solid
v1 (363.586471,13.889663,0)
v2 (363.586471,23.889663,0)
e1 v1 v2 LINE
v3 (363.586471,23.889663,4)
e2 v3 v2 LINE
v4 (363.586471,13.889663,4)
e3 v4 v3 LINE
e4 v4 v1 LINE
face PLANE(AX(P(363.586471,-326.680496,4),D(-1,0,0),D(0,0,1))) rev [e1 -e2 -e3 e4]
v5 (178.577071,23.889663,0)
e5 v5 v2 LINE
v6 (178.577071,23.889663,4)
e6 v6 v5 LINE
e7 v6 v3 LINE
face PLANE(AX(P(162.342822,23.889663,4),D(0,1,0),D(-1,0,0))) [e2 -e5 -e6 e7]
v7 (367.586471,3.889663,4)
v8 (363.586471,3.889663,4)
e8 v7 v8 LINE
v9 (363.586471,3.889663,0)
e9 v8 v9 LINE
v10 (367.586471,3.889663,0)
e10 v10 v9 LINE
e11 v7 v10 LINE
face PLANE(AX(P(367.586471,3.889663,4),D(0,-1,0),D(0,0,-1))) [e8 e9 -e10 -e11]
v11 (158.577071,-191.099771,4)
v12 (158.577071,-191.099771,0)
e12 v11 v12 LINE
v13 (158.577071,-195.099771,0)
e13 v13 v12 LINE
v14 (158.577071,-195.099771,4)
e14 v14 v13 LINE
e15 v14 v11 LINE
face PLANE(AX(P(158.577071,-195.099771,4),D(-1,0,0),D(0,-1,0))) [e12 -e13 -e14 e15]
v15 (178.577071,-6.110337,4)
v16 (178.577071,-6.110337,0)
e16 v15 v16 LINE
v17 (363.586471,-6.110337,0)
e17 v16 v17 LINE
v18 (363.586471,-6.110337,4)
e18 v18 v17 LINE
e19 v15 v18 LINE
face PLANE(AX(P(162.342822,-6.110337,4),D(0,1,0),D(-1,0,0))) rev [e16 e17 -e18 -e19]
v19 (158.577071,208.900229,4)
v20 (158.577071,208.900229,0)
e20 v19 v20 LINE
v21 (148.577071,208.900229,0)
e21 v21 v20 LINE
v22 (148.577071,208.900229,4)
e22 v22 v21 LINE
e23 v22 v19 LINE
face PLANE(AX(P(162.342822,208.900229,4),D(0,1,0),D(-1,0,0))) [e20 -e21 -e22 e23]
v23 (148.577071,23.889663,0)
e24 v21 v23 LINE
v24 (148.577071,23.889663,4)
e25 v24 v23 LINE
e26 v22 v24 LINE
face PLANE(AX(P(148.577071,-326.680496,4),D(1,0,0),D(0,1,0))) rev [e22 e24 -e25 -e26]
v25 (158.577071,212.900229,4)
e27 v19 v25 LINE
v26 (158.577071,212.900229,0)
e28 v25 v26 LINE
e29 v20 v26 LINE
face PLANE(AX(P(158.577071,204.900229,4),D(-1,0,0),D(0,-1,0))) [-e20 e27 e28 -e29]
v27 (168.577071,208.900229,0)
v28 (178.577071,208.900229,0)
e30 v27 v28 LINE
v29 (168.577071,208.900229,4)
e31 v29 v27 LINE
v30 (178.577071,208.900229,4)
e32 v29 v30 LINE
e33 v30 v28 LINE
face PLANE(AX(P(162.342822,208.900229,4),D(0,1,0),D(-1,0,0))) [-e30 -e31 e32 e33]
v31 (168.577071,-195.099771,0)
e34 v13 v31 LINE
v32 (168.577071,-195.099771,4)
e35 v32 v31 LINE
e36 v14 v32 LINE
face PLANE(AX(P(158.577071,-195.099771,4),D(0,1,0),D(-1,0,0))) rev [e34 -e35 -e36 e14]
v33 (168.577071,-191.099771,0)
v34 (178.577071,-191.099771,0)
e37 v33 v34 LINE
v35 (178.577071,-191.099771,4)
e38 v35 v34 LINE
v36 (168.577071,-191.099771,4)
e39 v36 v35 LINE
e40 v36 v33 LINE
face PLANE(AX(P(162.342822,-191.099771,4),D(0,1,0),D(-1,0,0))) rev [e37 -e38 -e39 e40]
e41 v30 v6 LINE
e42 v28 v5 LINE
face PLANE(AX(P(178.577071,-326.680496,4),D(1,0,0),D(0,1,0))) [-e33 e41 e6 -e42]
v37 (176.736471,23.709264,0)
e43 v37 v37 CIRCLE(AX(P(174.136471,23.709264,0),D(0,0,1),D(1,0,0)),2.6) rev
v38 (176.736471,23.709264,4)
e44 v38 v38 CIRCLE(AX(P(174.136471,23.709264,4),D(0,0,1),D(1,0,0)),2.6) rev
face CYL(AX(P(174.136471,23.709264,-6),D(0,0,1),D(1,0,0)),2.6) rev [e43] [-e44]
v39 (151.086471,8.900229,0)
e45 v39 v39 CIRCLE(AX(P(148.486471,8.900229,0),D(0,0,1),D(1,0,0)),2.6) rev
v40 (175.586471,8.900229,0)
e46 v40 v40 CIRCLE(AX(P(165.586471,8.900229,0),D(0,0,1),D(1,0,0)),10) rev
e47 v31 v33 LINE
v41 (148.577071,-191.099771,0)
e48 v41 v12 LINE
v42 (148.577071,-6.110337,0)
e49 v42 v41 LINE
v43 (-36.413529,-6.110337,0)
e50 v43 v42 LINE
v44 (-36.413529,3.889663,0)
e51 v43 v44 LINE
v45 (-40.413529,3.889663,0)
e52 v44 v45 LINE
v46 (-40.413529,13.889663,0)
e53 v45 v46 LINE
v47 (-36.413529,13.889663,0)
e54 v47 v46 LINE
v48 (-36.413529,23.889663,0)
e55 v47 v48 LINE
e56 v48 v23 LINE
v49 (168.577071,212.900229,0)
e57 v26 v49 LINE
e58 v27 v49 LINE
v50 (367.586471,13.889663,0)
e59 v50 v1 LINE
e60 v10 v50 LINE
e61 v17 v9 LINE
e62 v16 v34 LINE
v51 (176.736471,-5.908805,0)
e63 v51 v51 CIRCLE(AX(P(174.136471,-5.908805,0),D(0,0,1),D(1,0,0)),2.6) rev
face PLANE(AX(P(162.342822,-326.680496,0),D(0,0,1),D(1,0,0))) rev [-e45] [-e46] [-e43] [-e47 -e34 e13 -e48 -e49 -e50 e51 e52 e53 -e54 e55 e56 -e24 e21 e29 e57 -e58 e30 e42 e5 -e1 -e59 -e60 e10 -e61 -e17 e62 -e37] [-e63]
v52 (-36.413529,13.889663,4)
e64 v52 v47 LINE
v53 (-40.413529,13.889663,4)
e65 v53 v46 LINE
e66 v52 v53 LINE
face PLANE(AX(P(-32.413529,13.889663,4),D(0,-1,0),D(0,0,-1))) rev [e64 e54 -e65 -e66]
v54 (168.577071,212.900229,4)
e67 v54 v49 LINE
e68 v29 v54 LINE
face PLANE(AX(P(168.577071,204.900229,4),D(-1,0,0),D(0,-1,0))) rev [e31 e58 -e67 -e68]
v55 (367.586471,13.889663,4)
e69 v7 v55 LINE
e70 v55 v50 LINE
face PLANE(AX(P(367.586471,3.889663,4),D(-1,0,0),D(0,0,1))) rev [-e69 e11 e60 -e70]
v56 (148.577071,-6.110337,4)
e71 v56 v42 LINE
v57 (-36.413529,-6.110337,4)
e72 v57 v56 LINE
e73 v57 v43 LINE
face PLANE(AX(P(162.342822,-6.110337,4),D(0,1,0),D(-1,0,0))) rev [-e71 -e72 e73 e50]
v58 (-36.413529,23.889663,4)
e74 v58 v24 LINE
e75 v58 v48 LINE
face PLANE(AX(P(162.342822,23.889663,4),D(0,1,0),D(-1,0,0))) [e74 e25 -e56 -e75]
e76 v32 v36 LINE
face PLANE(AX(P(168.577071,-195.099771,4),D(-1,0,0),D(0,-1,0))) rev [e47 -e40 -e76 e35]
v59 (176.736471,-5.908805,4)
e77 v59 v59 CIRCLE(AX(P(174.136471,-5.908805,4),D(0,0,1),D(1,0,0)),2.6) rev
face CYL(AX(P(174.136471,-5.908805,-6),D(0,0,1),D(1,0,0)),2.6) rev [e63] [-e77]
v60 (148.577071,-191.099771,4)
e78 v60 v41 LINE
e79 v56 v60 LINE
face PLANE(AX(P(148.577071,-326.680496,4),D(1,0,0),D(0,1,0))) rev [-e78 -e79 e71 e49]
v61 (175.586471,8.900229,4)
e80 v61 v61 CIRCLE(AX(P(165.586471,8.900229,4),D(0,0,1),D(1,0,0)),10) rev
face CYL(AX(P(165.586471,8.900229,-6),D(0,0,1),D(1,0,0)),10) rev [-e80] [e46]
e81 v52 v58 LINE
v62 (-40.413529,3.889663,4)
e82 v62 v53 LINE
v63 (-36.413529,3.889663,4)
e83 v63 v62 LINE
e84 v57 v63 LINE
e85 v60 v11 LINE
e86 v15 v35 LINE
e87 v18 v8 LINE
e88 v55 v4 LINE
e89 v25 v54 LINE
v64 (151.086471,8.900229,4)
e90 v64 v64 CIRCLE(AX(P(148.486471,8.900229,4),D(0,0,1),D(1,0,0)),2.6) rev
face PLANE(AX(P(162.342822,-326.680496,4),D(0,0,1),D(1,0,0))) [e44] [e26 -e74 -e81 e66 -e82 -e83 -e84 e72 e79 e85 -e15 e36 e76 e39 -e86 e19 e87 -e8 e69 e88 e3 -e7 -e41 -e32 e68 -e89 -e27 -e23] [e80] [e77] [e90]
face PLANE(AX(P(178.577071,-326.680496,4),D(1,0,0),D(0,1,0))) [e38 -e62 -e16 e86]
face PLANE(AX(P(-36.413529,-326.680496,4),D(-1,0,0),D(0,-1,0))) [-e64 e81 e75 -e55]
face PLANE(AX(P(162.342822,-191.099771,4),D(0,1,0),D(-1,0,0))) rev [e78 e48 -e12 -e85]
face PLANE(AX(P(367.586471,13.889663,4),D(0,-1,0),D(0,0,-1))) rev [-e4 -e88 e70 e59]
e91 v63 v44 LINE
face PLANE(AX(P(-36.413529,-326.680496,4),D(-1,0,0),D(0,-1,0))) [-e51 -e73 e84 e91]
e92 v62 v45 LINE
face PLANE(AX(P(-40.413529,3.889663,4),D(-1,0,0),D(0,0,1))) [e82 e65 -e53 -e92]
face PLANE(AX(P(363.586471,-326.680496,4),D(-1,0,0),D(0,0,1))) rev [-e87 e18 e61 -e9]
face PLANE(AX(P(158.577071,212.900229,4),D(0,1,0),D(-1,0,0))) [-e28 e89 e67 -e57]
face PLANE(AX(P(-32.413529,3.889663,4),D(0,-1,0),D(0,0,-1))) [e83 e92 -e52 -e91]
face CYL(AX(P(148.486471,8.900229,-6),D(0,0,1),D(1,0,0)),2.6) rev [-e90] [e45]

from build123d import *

# Parameters (mm, degrees)
BOSS_EXTRUDE1_DEPTH = 4
CAVITY1_OUTLINE_R   = 2.6
CAVITY1_OUTLINE_R_2 = 10
CAVITY1_DEPTH       = 4


# Read off the part's stored shape, not the designer's step: Cavity1
with BuildPart() as part:
    # Sketch1 → Boss-Extrude1 (new body)
    with BuildSketch(Plane.XY):
        Polygon((363.586470787, 3.889663418), (367.586470787, 3.889663418), (367.586470787, 13.889663418), (363.586470787, 13.889663418), (363.586470787, 23.889663418), (178.577070849, 23.889663418), (178.577070849, 208.900229456), (168.577070849, 208.900229456), (168.577070849, 212.900229456), (158.577070849, 212.900229456), (158.577070849, 208.900229456), (148.577070849, 208.900229456), (148.577070849, 23.889663418), (-36.413529213, 23.889663418), (-36.413529213, 13.889663418), (-40.413529213, 13.889663418), (-40.413529213, 3.889663418), (-36.413529213, 3.889663418), (-36.413529213, -6.110336582), (148.577070849, -6.110336582), (148.577070849, -191.099770544), (158.577070849, -191.099770544), (158.577070849, -195.099770544), (168.577070849, -195.099770544), (168.577070849, -191.099770544), (178.577070849, -191.099770544), (178.577070849, -6.110336582), (363.586470787, -6.110336582), align=None)
    extrude(amount=BOSS_EXTRUDE1_DEPTH)

    # Cavity1 outline → Cavity1 (cut)
    with BuildSketch(Plane.XY):
        with Locations((174.136470787, 23.709263861)):
            Circle(CAVITY1_OUTLINE_R)
        with Locations((174.136470787, -5.908804949)):
            Circle(CAVITY1_OUTLINE_R)
        with Locations((148.486470787, 8.900229456)):
            Circle(CAVITY1_OUTLINE_R)
        with Locations((165.586470787, 8.900229456)):
            Circle(CAVITY1_OUTLINE_R_2)
    extrude(amount=CAVITY1_DEPTH, mode=Mode.SUBTRACT)


solid = part.part
